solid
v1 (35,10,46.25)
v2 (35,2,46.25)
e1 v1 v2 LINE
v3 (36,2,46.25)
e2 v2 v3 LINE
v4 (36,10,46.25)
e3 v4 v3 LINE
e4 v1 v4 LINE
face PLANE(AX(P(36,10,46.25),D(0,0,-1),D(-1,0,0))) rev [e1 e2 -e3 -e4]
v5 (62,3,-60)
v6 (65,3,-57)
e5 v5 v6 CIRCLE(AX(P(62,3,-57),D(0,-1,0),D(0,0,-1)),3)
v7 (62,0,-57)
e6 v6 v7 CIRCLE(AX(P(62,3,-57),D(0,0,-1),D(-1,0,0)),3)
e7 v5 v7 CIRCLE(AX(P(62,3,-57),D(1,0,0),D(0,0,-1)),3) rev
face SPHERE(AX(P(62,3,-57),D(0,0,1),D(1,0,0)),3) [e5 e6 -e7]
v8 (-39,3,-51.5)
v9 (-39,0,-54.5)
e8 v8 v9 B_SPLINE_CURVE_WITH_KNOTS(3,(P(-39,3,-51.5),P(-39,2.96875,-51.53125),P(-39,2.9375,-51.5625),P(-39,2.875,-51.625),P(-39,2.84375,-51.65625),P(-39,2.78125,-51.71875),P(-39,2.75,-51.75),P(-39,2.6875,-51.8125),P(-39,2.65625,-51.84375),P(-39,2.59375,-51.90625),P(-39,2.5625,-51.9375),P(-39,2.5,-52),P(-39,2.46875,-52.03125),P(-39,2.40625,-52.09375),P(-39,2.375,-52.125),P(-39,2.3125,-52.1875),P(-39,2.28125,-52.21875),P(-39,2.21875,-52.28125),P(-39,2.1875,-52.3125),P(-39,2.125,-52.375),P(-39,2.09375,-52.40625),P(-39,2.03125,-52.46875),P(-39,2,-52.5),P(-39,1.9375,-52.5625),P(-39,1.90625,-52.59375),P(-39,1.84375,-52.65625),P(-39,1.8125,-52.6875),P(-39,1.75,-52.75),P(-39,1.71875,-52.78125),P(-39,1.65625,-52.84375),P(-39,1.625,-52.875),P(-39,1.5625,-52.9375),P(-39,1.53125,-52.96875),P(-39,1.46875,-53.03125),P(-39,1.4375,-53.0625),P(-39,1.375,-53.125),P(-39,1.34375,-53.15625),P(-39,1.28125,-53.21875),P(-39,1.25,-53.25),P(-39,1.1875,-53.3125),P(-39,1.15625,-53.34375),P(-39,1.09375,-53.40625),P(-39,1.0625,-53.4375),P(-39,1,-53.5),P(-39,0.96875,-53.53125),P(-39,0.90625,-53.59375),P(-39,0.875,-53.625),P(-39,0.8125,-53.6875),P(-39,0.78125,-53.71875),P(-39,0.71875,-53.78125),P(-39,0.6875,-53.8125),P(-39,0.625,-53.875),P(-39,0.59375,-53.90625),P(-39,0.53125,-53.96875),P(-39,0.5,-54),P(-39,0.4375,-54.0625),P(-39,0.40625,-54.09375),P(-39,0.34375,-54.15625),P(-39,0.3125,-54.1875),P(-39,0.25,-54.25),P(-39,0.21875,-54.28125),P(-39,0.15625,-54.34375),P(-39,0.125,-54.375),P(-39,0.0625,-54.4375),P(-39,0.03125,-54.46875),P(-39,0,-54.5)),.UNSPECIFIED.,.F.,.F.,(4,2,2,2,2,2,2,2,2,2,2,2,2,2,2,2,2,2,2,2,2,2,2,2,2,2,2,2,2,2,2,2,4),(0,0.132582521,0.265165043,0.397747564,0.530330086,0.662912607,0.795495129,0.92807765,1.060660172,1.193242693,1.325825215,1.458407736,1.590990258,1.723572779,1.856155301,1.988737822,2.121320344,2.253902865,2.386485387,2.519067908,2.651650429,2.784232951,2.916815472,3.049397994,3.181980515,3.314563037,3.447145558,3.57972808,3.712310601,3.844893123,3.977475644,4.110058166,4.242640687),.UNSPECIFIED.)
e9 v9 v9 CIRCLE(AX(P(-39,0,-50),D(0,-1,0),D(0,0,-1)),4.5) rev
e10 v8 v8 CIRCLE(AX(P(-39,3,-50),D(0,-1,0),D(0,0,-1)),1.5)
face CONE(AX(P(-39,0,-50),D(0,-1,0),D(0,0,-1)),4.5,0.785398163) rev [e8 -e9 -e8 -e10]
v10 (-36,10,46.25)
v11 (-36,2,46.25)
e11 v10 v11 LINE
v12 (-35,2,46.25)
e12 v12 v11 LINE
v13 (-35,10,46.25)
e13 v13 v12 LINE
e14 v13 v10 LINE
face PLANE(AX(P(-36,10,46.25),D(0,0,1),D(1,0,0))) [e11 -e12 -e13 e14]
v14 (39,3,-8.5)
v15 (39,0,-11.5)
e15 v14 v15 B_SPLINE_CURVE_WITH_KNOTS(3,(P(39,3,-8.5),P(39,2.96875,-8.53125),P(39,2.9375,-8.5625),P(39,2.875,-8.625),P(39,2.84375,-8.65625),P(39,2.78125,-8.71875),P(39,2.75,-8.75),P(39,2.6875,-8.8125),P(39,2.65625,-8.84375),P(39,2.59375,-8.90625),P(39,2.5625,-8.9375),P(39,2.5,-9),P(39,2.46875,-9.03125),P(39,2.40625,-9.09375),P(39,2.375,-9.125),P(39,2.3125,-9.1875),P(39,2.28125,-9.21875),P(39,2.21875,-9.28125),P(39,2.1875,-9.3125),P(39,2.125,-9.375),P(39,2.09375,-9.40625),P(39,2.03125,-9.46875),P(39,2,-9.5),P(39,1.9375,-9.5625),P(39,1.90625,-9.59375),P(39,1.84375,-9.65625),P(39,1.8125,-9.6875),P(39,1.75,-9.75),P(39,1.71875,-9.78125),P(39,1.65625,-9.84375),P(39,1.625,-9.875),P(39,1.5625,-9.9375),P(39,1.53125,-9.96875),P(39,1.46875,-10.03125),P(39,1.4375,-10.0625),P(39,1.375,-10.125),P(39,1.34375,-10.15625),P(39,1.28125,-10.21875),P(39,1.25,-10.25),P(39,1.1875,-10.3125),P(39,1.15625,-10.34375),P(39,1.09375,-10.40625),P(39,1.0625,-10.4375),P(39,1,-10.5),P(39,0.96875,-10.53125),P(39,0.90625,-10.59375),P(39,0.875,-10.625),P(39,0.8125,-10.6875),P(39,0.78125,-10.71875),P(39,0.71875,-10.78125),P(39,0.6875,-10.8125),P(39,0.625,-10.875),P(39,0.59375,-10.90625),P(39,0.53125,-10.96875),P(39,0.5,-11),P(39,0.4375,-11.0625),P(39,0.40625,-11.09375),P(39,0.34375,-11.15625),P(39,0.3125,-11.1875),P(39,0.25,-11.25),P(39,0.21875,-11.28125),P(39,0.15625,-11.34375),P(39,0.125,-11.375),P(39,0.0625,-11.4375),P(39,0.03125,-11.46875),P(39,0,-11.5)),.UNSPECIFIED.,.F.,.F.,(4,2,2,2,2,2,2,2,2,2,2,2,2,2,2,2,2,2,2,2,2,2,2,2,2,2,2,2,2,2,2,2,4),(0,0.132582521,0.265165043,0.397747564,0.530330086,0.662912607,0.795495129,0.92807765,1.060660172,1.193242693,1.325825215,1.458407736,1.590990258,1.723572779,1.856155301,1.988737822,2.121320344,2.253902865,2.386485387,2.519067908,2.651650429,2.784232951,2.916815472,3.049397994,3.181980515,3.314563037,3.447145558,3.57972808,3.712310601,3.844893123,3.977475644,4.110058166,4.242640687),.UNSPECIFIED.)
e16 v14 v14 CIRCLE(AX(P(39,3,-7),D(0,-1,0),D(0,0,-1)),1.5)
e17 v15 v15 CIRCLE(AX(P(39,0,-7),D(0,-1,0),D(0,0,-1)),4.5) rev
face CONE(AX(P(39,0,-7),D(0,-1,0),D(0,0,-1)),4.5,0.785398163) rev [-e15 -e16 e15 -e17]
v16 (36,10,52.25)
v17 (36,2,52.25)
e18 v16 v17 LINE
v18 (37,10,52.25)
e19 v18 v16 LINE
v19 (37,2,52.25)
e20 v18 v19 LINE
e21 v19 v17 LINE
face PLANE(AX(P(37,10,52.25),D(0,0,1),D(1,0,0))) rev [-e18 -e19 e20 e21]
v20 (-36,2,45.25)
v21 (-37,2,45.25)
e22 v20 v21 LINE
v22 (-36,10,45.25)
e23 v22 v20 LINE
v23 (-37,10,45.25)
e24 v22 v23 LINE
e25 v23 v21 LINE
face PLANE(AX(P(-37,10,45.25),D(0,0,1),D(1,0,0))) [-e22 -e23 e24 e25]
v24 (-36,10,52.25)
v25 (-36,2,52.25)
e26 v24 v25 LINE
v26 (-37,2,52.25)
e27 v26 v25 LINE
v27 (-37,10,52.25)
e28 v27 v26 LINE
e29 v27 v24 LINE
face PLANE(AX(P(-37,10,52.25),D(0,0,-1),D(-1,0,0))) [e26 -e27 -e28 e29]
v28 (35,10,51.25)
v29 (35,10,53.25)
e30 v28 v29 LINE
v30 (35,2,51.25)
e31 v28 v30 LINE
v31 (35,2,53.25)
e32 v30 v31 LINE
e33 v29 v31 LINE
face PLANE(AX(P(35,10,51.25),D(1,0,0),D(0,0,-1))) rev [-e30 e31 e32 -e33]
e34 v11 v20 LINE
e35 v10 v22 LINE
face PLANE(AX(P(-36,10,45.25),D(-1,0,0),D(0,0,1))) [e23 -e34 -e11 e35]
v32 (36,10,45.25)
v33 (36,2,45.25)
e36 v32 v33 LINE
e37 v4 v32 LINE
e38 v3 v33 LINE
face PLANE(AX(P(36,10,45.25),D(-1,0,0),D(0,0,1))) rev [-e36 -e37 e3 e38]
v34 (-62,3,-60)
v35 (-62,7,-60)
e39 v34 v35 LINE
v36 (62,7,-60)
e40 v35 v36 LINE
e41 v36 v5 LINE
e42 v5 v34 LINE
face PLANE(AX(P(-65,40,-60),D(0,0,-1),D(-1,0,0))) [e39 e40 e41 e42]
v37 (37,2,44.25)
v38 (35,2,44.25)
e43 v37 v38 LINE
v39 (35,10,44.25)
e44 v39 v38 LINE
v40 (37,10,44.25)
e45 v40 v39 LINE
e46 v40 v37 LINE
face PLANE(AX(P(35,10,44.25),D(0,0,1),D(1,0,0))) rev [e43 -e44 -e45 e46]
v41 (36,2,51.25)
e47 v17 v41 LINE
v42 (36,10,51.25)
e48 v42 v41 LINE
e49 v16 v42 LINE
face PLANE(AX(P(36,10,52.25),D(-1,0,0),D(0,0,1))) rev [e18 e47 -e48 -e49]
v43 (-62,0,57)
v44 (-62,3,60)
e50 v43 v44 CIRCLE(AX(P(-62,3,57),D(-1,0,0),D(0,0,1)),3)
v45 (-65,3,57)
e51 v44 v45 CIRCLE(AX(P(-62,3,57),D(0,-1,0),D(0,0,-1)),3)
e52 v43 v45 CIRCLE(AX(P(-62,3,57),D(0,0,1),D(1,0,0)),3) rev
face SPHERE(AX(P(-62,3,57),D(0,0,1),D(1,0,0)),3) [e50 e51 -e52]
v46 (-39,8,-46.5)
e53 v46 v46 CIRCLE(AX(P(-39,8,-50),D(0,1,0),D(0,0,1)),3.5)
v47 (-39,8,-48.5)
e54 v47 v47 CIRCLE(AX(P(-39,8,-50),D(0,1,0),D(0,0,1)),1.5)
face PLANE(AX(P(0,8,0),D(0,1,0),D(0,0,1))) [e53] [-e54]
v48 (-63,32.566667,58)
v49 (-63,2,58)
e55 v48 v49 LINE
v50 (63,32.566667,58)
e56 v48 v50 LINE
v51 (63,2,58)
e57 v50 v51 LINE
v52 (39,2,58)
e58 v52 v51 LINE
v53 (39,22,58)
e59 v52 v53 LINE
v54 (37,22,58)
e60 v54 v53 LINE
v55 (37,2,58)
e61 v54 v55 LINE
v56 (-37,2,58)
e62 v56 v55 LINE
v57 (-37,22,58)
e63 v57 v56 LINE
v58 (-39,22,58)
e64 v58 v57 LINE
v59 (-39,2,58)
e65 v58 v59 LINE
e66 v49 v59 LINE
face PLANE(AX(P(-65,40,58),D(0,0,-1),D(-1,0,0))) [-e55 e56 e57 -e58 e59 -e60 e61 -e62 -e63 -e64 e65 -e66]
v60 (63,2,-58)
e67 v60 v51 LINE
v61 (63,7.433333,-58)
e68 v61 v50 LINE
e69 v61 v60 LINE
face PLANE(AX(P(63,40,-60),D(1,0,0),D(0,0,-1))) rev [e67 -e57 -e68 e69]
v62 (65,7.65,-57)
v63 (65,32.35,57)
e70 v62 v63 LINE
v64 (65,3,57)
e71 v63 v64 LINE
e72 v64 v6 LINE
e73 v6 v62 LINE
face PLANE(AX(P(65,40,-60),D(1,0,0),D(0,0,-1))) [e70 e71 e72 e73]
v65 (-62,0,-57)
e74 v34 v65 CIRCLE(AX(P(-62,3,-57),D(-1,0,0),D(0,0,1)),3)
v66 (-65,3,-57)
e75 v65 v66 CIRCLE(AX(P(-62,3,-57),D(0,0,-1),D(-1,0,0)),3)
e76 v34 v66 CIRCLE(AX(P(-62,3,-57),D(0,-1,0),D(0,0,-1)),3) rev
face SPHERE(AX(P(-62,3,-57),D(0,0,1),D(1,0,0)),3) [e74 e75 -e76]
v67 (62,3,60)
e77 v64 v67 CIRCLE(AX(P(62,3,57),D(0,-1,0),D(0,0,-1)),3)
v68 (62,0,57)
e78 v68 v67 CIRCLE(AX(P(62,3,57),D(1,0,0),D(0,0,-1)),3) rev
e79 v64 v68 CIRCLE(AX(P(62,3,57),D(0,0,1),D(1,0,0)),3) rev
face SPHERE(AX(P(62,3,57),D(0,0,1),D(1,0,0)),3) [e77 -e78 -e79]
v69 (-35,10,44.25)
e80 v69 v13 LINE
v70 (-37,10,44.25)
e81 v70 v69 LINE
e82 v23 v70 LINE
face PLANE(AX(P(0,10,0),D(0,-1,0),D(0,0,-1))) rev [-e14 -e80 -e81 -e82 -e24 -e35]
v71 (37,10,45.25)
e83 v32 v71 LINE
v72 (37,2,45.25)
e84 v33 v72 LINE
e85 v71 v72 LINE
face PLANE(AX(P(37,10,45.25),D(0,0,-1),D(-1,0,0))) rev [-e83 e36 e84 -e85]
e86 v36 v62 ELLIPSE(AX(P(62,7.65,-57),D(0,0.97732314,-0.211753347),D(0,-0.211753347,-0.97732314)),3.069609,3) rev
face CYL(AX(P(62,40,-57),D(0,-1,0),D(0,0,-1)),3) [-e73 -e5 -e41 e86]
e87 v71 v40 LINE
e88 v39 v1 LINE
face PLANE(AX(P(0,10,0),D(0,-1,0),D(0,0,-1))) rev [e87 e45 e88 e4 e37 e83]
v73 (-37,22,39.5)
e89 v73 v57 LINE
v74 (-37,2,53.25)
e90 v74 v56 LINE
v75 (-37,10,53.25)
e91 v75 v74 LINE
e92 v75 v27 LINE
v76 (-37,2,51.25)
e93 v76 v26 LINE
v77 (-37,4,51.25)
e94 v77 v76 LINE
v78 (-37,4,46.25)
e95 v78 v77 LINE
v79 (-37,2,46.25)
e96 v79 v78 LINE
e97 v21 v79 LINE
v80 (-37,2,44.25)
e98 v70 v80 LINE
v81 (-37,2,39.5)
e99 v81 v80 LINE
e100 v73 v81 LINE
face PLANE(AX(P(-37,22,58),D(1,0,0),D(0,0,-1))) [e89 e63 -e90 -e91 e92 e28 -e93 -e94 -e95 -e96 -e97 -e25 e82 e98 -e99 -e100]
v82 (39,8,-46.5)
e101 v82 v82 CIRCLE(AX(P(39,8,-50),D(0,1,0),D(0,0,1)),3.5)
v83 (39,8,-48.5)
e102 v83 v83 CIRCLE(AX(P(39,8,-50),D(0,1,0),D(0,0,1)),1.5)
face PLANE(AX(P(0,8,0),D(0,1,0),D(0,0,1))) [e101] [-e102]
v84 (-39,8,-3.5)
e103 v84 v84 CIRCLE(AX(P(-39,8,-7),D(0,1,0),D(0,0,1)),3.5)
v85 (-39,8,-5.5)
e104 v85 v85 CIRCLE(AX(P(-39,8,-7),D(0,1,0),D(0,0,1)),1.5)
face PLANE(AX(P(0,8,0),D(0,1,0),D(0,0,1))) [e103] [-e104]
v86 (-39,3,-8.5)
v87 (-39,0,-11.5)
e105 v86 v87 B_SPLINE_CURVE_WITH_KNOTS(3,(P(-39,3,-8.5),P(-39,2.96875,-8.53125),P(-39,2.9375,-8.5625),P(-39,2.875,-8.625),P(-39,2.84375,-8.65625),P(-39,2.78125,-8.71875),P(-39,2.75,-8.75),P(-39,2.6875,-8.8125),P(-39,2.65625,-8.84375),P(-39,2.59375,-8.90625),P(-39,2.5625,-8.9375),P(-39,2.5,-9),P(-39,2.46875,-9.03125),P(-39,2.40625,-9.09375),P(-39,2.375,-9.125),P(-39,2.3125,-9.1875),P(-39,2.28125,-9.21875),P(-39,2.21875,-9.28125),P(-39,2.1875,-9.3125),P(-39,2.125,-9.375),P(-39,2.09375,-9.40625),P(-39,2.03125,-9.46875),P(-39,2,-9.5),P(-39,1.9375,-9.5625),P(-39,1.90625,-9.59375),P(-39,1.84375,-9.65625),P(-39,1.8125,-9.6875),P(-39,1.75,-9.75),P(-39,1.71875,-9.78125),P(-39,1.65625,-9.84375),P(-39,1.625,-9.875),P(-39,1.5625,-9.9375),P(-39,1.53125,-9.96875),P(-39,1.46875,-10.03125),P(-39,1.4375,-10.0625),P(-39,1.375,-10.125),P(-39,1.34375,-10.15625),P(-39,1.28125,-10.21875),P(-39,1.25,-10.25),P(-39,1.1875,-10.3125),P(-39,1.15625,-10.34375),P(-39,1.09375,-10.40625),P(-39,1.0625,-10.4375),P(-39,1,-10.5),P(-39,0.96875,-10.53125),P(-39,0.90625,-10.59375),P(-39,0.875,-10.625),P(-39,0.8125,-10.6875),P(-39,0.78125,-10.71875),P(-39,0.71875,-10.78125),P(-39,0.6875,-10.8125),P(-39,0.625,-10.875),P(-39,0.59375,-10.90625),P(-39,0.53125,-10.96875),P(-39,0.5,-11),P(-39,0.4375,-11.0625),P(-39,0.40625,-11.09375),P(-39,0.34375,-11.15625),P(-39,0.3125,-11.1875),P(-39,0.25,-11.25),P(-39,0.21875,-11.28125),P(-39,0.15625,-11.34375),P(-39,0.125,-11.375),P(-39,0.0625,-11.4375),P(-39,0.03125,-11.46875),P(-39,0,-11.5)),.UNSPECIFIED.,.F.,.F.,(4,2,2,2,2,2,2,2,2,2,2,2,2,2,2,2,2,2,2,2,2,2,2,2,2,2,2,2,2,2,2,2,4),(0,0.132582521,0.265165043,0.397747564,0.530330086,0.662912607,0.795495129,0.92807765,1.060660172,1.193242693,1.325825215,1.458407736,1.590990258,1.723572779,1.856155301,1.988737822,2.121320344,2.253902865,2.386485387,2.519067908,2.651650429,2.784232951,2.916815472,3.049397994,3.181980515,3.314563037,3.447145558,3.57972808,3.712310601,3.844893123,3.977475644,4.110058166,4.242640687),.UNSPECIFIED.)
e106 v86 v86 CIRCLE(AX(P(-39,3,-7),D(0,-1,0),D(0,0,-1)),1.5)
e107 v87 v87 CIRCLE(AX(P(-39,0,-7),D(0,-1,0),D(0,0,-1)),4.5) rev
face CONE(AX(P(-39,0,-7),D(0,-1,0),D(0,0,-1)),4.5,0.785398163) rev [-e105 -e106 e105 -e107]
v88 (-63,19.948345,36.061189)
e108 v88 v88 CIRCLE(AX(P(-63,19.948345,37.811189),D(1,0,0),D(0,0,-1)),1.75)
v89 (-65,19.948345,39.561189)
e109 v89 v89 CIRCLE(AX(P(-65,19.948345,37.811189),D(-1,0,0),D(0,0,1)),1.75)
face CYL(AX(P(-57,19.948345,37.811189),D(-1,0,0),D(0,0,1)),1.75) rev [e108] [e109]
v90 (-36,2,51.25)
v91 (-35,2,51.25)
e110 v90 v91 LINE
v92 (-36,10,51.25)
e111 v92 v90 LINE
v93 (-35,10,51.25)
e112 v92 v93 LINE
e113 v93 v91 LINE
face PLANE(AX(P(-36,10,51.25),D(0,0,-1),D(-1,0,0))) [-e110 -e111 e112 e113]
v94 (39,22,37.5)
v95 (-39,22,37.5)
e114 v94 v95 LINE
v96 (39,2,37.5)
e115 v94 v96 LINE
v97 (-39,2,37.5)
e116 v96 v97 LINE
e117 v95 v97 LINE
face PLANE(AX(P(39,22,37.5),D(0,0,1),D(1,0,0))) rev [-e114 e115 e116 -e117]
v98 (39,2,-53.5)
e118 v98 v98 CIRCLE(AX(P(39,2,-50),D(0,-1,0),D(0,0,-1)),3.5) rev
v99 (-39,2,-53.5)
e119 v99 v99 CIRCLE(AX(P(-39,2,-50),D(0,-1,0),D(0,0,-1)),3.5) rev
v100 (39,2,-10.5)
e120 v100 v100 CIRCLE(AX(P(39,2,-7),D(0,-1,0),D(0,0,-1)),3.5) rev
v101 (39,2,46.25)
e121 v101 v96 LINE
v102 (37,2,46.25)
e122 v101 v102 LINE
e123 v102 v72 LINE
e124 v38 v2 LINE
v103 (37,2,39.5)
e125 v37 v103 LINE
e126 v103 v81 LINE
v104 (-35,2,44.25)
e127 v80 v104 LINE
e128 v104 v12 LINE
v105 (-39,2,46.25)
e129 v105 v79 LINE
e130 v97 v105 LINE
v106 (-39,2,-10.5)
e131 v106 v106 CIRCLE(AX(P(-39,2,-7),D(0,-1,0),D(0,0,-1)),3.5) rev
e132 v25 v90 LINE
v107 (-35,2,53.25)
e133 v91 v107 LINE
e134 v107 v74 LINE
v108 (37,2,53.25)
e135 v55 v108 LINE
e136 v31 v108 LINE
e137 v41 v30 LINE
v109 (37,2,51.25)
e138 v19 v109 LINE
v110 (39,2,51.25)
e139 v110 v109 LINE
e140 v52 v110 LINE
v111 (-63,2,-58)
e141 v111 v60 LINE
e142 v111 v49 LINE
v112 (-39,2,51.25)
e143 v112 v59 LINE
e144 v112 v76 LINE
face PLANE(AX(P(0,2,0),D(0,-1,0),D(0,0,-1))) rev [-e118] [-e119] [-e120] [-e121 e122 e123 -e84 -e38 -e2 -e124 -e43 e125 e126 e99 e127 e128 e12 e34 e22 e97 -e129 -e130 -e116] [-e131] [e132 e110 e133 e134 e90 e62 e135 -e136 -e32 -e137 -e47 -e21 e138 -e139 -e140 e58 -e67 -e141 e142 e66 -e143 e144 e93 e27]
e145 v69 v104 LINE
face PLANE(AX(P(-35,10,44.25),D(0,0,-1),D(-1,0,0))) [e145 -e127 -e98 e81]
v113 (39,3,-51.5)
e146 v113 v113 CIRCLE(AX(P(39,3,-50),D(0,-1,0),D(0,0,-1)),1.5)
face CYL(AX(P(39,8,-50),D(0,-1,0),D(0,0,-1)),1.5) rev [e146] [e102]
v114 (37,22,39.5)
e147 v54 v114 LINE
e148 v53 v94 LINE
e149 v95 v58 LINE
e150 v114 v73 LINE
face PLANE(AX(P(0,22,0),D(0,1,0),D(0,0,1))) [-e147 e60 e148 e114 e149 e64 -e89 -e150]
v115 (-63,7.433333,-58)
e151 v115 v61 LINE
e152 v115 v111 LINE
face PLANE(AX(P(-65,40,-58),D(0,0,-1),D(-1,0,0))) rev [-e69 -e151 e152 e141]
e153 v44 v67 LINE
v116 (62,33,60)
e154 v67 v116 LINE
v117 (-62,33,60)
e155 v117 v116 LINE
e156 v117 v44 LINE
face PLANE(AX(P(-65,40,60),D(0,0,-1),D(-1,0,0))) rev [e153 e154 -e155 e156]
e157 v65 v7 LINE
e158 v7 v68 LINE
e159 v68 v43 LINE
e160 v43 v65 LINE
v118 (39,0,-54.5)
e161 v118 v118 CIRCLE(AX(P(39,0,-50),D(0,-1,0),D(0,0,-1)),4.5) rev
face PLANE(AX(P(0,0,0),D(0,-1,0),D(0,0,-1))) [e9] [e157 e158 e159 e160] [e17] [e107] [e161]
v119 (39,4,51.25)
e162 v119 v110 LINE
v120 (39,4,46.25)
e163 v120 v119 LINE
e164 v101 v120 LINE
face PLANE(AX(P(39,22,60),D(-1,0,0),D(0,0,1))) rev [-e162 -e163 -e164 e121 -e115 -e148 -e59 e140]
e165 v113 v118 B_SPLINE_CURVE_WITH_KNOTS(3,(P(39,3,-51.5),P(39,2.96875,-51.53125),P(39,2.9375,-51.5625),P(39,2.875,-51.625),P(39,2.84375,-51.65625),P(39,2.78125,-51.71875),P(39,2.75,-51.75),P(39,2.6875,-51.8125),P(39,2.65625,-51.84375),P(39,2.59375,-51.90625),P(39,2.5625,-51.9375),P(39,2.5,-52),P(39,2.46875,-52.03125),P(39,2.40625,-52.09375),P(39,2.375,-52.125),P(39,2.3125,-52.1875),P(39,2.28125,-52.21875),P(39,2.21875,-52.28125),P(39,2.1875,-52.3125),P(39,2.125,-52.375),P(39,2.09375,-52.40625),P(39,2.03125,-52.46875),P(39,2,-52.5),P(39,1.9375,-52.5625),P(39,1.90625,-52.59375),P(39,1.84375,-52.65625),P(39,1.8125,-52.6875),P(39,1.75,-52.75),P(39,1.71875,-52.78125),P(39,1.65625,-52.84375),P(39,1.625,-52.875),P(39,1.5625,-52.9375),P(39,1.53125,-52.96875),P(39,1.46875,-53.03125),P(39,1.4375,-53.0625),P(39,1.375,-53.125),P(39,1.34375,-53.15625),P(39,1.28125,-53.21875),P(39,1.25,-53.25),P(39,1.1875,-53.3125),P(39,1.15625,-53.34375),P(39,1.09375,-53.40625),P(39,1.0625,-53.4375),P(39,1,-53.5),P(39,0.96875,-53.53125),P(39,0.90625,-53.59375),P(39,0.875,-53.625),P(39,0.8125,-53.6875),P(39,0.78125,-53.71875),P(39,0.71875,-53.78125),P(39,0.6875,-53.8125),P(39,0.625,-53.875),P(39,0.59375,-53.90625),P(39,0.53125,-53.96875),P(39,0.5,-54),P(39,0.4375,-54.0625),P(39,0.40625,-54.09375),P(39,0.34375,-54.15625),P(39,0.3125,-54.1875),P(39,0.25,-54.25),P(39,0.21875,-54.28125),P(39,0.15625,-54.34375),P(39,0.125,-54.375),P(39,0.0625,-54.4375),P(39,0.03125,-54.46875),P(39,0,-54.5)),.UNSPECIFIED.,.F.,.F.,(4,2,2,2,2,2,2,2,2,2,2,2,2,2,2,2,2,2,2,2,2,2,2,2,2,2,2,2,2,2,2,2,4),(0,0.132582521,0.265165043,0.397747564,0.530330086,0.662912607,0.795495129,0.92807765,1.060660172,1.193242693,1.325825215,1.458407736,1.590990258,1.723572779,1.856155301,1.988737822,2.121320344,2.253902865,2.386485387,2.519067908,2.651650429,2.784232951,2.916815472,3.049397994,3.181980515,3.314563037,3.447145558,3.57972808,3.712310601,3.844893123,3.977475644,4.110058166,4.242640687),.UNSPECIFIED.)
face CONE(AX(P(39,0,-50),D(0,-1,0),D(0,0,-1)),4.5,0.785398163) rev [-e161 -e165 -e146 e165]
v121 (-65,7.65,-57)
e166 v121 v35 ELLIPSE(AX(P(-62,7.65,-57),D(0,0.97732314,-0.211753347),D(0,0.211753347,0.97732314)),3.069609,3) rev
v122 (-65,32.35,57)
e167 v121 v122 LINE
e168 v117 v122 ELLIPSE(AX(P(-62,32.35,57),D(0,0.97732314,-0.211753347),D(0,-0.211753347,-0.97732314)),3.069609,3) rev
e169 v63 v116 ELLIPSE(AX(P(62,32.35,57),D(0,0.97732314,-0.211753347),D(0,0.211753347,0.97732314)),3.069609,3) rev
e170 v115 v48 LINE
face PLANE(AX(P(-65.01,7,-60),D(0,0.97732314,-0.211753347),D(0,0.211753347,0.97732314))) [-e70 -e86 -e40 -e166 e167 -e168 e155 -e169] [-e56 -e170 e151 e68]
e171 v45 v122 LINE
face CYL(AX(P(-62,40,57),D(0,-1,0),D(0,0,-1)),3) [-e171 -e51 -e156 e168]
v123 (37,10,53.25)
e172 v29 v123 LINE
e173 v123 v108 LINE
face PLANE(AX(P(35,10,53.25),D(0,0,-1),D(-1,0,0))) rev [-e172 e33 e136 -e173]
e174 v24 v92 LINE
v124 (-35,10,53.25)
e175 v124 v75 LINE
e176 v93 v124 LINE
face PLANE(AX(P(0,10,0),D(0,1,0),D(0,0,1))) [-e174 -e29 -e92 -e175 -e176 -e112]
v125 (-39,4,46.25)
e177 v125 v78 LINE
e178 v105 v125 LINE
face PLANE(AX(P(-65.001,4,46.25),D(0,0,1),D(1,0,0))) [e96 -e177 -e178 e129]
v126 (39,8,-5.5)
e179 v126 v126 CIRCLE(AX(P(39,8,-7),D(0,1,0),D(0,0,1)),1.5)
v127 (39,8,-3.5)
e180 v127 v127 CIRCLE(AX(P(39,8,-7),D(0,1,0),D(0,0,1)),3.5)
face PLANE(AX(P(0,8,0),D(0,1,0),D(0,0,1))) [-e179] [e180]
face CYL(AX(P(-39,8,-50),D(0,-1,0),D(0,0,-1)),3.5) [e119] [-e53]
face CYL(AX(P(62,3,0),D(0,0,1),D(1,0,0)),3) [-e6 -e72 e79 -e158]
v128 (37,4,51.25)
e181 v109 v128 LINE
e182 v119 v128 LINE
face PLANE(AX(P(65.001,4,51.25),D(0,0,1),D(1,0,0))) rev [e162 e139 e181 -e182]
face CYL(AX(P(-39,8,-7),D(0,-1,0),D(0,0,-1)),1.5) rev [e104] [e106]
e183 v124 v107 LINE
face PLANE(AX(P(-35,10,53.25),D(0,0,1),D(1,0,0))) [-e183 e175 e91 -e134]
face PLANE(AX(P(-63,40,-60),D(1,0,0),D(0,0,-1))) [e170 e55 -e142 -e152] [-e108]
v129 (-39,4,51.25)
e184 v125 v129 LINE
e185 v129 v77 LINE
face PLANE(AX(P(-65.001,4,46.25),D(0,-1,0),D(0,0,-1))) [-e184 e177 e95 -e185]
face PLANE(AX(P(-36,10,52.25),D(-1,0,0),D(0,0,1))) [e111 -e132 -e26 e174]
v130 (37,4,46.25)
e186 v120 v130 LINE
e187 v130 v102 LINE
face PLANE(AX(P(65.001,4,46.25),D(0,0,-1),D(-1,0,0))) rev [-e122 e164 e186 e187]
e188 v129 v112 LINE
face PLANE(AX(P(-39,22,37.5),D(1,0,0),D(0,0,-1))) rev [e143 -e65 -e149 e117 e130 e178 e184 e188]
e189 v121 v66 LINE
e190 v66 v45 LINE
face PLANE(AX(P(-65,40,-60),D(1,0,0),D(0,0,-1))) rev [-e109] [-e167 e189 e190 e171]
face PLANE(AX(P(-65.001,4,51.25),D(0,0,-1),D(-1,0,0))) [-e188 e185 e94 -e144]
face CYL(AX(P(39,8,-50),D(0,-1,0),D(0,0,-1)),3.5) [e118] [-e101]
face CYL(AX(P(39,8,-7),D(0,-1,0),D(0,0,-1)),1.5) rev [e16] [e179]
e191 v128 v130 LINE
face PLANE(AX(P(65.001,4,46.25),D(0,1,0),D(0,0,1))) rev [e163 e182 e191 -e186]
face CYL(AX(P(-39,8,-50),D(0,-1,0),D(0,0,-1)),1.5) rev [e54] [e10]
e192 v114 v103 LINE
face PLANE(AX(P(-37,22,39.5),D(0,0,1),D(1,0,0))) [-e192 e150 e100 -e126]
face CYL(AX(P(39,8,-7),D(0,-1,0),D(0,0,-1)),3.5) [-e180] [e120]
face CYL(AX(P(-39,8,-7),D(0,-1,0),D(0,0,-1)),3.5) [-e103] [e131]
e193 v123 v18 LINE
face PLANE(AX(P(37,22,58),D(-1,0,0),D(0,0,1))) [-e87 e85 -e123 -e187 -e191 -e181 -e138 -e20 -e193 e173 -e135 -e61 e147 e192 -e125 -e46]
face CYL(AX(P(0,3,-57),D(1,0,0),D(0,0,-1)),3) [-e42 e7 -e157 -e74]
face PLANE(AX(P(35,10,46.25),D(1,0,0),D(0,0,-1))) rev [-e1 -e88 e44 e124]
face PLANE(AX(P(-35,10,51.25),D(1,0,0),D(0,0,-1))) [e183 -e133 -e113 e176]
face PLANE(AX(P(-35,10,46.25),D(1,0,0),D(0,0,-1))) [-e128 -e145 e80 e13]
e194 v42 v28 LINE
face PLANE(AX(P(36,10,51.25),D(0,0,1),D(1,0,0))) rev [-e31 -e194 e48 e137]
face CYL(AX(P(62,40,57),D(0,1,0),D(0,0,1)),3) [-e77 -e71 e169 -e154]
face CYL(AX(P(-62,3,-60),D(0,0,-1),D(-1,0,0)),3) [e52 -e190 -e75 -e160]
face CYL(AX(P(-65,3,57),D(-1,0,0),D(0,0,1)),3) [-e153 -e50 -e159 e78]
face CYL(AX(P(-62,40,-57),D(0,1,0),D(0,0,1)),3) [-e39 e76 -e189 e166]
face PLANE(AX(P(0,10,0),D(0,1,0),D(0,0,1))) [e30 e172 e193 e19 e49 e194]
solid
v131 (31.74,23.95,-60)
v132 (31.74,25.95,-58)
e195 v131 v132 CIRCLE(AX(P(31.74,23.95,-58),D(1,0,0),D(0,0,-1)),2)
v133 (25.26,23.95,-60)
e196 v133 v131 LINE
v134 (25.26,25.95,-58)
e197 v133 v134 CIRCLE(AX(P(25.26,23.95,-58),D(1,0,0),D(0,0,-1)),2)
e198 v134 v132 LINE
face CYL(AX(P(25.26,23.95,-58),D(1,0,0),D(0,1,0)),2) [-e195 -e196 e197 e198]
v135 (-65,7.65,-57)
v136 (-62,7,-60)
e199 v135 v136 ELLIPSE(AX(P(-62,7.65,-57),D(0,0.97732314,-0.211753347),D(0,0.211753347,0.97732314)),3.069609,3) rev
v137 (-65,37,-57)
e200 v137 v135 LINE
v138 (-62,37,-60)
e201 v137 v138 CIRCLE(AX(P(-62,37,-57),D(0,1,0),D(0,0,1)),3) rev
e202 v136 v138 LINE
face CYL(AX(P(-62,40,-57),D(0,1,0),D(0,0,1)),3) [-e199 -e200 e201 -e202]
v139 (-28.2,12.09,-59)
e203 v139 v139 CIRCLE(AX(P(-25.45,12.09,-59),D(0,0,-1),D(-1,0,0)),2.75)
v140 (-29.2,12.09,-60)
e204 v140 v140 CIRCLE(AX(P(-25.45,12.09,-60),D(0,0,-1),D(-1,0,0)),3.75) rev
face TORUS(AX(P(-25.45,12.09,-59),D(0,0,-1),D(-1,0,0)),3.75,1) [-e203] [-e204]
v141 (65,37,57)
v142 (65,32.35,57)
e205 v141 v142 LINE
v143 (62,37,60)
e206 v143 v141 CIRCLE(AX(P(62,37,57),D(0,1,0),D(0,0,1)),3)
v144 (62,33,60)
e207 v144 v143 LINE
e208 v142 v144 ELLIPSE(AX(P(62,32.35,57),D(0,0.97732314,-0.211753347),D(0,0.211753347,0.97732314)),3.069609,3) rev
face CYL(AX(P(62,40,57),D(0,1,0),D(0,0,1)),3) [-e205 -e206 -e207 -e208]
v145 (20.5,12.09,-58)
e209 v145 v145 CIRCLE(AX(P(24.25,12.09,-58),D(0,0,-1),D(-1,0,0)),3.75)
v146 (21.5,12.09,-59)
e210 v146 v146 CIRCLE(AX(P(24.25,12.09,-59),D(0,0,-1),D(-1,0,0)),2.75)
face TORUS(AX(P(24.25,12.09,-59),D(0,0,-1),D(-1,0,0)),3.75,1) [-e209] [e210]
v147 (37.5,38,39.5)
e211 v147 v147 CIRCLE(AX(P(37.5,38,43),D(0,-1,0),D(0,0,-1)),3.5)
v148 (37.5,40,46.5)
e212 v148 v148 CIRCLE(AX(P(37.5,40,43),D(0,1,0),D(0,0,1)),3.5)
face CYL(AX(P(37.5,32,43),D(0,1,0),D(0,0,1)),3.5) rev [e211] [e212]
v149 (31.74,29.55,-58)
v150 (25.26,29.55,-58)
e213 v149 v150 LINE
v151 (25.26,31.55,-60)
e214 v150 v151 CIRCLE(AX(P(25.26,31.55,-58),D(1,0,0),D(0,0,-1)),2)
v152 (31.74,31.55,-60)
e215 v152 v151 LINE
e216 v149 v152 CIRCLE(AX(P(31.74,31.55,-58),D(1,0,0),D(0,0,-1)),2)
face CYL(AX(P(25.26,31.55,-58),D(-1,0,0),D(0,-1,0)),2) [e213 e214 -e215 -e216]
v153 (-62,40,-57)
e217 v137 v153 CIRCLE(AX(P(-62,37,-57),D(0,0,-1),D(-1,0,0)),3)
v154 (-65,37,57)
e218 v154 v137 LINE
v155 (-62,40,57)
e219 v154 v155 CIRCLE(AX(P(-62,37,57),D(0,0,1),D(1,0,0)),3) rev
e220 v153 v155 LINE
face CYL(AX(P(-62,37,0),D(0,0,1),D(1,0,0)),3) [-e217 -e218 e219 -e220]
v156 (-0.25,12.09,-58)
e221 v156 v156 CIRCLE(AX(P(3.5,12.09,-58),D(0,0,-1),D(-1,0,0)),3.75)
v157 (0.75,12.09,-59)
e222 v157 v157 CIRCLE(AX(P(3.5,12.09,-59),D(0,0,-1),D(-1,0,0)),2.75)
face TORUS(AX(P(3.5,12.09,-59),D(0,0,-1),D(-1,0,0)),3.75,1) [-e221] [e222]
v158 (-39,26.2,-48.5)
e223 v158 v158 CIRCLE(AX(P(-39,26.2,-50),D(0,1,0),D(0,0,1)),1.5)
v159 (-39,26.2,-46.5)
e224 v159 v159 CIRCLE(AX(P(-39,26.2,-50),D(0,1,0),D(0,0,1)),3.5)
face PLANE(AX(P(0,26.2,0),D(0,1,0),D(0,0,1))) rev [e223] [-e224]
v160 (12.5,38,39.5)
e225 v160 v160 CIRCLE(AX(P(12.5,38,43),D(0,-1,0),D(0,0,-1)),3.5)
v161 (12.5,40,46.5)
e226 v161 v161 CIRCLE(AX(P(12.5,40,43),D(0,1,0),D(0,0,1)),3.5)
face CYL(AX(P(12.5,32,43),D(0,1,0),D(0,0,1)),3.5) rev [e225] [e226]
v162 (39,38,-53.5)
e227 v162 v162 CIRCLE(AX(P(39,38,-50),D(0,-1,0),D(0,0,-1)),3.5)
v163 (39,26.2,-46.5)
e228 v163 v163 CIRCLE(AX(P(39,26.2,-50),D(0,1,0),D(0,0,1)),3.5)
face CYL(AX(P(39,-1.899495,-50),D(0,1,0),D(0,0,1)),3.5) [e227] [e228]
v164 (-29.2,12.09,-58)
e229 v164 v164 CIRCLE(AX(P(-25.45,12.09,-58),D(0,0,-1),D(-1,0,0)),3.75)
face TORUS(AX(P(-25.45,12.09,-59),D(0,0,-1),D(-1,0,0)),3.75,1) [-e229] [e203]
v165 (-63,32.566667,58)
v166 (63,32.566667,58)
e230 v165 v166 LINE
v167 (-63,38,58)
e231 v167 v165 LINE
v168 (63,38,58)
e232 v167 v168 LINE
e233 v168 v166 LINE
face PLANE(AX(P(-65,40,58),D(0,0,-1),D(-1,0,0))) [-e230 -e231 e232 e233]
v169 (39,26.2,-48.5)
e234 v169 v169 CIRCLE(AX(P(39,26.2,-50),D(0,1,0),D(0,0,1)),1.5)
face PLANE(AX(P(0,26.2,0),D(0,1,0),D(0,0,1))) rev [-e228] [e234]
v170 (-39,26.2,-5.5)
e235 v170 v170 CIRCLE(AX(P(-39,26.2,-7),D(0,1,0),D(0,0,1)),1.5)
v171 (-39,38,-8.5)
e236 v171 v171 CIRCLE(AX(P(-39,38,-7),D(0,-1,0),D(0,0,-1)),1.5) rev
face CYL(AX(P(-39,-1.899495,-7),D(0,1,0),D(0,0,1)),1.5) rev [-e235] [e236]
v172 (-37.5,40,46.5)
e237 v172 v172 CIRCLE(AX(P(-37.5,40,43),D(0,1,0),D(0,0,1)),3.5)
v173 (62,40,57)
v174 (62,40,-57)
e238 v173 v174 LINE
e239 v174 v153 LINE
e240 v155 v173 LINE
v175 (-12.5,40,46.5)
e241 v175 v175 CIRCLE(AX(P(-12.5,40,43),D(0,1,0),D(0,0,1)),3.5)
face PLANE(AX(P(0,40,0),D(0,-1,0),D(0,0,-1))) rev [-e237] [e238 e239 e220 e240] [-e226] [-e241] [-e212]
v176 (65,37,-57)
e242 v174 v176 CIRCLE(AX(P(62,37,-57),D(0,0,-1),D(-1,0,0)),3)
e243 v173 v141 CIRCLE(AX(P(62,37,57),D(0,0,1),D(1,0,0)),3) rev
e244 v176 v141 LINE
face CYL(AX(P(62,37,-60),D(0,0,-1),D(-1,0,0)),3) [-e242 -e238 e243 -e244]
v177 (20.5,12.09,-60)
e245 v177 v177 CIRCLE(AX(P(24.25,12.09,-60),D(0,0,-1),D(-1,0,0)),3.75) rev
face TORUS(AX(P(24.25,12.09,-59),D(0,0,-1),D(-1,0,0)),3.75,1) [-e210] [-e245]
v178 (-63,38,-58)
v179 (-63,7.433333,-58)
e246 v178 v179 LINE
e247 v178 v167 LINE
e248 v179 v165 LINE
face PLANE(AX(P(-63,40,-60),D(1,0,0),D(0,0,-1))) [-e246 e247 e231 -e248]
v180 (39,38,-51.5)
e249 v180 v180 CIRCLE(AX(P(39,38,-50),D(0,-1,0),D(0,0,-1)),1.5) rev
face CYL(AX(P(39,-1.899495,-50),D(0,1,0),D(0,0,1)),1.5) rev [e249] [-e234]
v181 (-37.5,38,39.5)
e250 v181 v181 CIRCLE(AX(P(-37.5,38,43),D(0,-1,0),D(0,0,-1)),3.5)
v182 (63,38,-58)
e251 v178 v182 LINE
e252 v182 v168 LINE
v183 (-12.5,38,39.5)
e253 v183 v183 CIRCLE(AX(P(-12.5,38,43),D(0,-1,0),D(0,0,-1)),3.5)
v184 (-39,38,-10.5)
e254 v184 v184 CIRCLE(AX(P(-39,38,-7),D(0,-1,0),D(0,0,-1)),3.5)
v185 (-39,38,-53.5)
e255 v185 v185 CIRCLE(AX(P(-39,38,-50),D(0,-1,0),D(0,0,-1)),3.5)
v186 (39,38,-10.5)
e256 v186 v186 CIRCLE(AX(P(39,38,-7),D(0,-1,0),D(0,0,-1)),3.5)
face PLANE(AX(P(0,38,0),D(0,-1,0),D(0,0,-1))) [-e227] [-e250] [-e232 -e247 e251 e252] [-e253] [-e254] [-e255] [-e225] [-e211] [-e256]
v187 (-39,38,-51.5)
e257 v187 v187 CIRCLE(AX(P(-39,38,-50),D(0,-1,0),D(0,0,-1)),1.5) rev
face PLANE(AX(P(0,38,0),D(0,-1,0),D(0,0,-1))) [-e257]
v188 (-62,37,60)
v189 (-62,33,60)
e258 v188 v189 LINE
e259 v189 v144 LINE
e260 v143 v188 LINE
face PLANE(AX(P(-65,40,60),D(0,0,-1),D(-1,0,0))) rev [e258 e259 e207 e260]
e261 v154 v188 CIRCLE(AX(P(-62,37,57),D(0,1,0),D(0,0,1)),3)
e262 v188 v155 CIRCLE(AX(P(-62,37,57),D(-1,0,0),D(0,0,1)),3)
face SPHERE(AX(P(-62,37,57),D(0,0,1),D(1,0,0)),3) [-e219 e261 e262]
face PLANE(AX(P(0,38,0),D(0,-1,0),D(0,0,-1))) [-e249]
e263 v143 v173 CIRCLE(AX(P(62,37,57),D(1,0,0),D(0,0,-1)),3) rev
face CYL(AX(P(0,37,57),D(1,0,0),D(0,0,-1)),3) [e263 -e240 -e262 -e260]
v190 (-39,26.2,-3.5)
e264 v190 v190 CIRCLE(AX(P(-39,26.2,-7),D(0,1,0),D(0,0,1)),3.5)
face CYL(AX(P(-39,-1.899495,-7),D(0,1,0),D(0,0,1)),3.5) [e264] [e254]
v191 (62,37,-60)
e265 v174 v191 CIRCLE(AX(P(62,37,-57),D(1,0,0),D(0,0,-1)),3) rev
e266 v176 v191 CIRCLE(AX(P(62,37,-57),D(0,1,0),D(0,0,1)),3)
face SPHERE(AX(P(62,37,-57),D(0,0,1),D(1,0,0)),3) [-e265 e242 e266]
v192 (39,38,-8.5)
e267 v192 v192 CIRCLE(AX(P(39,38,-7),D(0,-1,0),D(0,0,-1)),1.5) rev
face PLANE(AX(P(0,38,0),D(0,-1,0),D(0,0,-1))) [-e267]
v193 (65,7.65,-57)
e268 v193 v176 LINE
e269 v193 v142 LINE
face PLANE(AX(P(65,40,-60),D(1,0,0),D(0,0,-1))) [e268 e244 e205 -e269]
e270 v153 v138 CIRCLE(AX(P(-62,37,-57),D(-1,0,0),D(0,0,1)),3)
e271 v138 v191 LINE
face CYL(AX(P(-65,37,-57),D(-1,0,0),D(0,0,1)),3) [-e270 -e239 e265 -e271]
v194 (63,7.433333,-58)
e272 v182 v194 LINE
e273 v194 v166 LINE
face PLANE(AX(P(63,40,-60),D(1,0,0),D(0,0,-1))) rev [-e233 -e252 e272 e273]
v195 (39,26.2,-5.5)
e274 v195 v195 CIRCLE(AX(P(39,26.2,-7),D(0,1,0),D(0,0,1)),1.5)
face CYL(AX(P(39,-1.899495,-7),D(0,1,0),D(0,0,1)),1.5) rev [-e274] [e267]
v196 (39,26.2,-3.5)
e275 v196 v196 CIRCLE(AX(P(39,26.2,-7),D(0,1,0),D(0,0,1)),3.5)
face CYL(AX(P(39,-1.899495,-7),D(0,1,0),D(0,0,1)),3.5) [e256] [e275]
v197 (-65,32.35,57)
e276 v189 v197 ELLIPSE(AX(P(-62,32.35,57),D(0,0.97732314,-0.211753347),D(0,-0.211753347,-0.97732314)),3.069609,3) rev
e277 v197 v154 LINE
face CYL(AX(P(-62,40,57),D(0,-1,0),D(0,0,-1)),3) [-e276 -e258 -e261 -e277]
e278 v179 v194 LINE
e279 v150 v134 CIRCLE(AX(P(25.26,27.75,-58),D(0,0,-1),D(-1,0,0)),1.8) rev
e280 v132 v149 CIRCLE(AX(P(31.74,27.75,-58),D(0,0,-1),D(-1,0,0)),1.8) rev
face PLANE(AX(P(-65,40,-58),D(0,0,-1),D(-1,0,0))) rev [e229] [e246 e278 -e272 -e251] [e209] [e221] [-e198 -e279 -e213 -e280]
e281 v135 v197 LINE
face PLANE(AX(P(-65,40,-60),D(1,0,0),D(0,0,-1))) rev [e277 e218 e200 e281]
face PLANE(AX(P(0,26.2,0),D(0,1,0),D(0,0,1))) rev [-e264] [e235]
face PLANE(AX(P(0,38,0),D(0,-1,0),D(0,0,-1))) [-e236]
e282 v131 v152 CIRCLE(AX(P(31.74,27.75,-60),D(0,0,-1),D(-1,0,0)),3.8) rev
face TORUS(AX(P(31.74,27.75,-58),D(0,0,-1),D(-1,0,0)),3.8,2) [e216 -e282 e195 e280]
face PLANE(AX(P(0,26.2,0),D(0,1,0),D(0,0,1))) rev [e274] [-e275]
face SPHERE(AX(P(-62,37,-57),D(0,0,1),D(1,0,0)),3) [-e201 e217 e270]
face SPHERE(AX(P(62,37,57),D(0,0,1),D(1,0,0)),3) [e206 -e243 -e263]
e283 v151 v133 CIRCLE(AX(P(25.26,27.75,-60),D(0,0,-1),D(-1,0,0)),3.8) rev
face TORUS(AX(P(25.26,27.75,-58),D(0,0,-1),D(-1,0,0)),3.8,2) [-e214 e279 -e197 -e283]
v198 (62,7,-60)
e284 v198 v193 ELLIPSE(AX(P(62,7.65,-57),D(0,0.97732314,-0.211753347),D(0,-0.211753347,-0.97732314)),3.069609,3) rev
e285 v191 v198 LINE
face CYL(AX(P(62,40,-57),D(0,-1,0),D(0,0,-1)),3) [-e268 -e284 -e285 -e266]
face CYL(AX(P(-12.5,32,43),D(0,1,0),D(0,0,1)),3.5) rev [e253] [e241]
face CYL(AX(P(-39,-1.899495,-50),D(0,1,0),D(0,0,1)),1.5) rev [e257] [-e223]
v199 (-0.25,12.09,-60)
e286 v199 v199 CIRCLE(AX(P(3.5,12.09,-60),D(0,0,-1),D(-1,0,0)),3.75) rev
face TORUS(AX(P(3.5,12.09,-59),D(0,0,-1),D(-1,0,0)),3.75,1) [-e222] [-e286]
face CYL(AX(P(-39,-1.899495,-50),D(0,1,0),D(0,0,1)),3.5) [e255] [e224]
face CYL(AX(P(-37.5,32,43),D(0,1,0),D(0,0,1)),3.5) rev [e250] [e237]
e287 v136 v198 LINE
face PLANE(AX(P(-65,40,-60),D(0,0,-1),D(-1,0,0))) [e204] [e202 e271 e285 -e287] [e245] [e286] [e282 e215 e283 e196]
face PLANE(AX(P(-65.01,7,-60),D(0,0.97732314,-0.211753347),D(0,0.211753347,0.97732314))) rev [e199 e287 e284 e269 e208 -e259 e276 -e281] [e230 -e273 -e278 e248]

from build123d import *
from OCP.BRepFilletAPI import BRepFilletAPI_MakeFillet

# Parameters (mm, degrees)
SKETCH1_W                      = 130
SKETCH1_H                      = 120
BOSS_EXTRUDE1_DEPTH            = 40
SHELL1_T                       = 2
SKETCH1_7_R                    = 3.5
SKETCH1_7_R_2                  = 1.5
BOSS_EXTRUDE2_DEPTH            = 8
SKETCH2_W                      = 78
SKETCH2_H                      = 22.5
SKETCH2_W_2                    = 74
SKETCH2_H_2                    = 18.5
BOSS_EXTRUDE3_DEPTH            = 20
BOSS_EXTRUDE4_DEPTH            = 8
FILLET1_R                      = 3
CUT_EXTRUDE1_REACH             = 126.916
SKETCH3_W                      = 5
SKETCH3_H                      = 2
CUT_EXTRUDE1_DIRECTION_2_REACH = 126.916
BOSS_EXTRUDE5_START            = 26.2
SKETCH1_9_R                    = 3.5
SKETCH1_9_R_2                  = 1.5
BOSS_EXTRUDE5_DEPTH            = 11.8
SKETCH1_11_R                   = 1.5
CUT_EXTRUDE3_DEPTH             = 8
CHAMFER1_SIZE                  = 3
SKETCH6_R                      = 3.5
CUT_EXTRUDE4_DEPTH             = 8
SKETCH7_R                      = 1.75
CUT_EXTRUDE5_DEPTH             = 8
SPLIT1_SURFACE_1_BACK          = 182.384
SPLIT1_SURFACE_1_DEPTH         = 364.768
SPLIT1_SURFACE_2_BACK          = 182.384
SPLIT1_SURFACE_2_DEPTH         = 364.768
SKETCH9_R                      = 2.75
CUT_EXTRUDE6_DEPTH             = 2
FILLET2_R                      = 2
FILLET2_R_2                    = 1


with BuildPart() as part:
    # Sketch1 → Boss-Extrude1 (new body)
    with BuildSketch(Plane(origin=(0, 0, 0), x_dir=(1, 0, 0), z_dir=(0, 1, 0))):
        Rectangle(SKETCH1_W, SKETCH1_H)
    extrude(amount=BOSS_EXTRUDE1_DEPTH)

    # Shell1 (no face opened: a closed hollow body)
    add(offset(amount=-SHELL1_T, mode=Mode.PRIVATE), mode=Mode.SUBTRACT)

    # Sketch1<7> → Boss-Extrude2 (add)
    # profile 1 of 4: a face of its own
    with BuildSketch(Plane(origin=(0, 0, 0), x_dir=(1, 0, 0), z_dir=(0, 1, 0))):
        with Locations(Location((-39, 7, 0), (0, 0, 90))):
            Circle(SKETCH1_7_R)
        with Locations(Location((-39, 7, 0), (0, 0, 90))):
            Circle(SKETCH1_7_R_2, mode=Mode.SUBTRACT)
    # profile 2 of 4: a face of its own
    with BuildSketch(Plane(origin=(0, 0, 0), x_dir=(1, 0, 0), z_dir=(0, 1, 0))):
        with Locations(Location((-39, 50, 0), (0, 0, 90))):
            Circle(SKETCH1_7_R)
        with Locations(Location((-39, 50, 0), (0, 0, 90))):
            Circle(SKETCH1_7_R_2, mode=Mode.SUBTRACT)
    # profile 3 of 4: a face of its own
    with BuildSketch(Plane(origin=(0, 0, 0), x_dir=(1, 0, 0), z_dir=(0, 1, 0))):
        with Locations(Location((39, 50, 0), (0, 0, 90))):
            Circle(SKETCH1_7_R)
        with Locations(Location((39, 50, 0), (0, 0, 90))):
            Circle(SKETCH1_7_R_2, mode=Mode.SUBTRACT)
    # profile 4 of 4: a face of its own
    with BuildSketch(Plane(origin=(0, 0, 0), x_dir=(1, 0, 0), z_dir=(0, 1, 0))):
        with Locations(Location((39, 7, 0), (0, 0, 90))):
            Circle(SKETCH1_7_R)
        with Locations(Location((39, 7, 0), (0, 0, 90))):
            Circle(SKETCH1_7_R_2, mode=Mode.SUBTRACT)
    extrude(amount=BOSS_EXTRUDE2_DEPTH)

    # Sketch2 → Boss-Extrude3 (add)
    with BuildSketch(Plane(origin=(0, 2, 0), x_dir=(1, 0, 0), z_dir=(0, 1, 0))):
        with Locations((0, -48.75)):
            Rectangle(SKETCH2_W, SKETCH2_H)
        with Locations((0, -48.75)):
            Rectangle(SKETCH2_W_2, SKETCH2_H_2, mode=Mode.SUBTRACT)
    extrude(amount=BOSS_EXTRUDE3_DEPTH)

    # Sketch4 → Boss-Extrude4 (add)
    with BuildSketch(Plane(origin=(0, 2, 0), x_dir=(1, 0, 0), z_dir=(0, 1, 0))):
        Polygon((37, -45.25), (36, -45.25), (36, -46.25), (35, -46.25), (35, -44.25), (37, -44.25), align=None)
        Polygon((37, -52.25), (36, -52.25), (36, -51.25), (35, -51.25), (35, -53.25), (37, -53.25), align=None)
    boss_extrude4 = extrude(amount=BOSS_EXTRUDE4_DEPTH)

    # Fillet1
    fillet1_edges = [part.edges().sort_by_distance(p)[0] for p in [
        (0, 40, 60),
        (-65, 40, 0),
        (0, 40, -60),
        (-65, 0, 0),
        (0, 0, 60),
        (65, 0, 0),
        (0, 0, -60),
        (65, 40, 0),
        (-65, 20, -60),
        (-65, 20, 60),
        (65, 20, 60),
        (65, 20, -60),
    ]]
    fillet(fillet1_edges, radius=FILLET1_R)

    # Sketch3 → Cut-Extrude1 (cut, up to next)
    with BuildSketch(Plane.ZY.offset(-37), mode=Mode.PRIVATE) as cut_extrude1_sk1:
        with Locations((48.75, 3)):
            Rectangle(SKETCH3_W, SKETCH3_H)
    cut_extrude1_tool1 = extrude(cut_extrude1_sk1.sketch, amount=-CUT_EXTRUDE1_REACH, mode=Mode.PRIVATE) & part.part
    add(cut_extrude1_tool1.solids().sort_by_distance((37, 3, 48.75))[0], mode=Mode.SUBTRACT)

    # Sketch3 → Cut-Extrude1 direction 2 (cut, up to next)
    with BuildSketch(Plane.ZY.offset(-37), mode=Mode.PRIVATE) as cut_extrude1_direction_2_sk1:
        with Locations((48.75, 3)):
            Rectangle(SKETCH3_W, SKETCH3_H)
    cut_extrude1_direction_2_tool1 = extrude(cut_extrude1_direction_2_sk1.sketch, amount=CUT_EXTRUDE1_DIRECTION_2_REACH, mode=Mode.PRIVATE) & part.part
    add(cut_extrude1_direction_2_tool1.solids().sort_by_distance((37, 3, 48.75))[0], mode=Mode.SUBTRACT)

    # Mirror1: Boss-Extrude4 across plane
    add(boss_extrude4.mirror(Plane(origin=(0, 0, 0), x_dir=(0, 0, 1), z_dir=(1, 0, 0))))

    # Sketch1<9> → Boss-Extrude5 (add)
    # profile 1 of 4: a face of its own
    with BuildSketch(Plane(origin=(0, 0, 0), x_dir=(1, 0, 0), z_dir=(0, 1, 0)).offset(BOSS_EXTRUDE5_START)):
        with Locations(Location((-39, 50, 0), (0, 0, 90))):
            Circle(SKETCH1_9_R)
        with Locations(Location((-39, 50, 0), (0, 0, 90))):
            Circle(SKETCH1_9_R_2, mode=Mode.SUBTRACT)
    # profile 2 of 4: a face of its own
    with BuildSketch(Plane(origin=(0, 0, 0), x_dir=(1, 0, 0), z_dir=(0, 1, 0)).offset(BOSS_EXTRUDE5_START)):
        with Locations(Location((-39, 7, 0), (0, 0, 90))):
            Circle(SKETCH1_9_R)
        with Locations(Location((-39, 7, 0), (0, 0, 90))):
            Circle(SKETCH1_9_R_2, mode=Mode.SUBTRACT)
    # profile 3 of 4: a face of its own
    with BuildSketch(Plane(origin=(0, 0, 0), x_dir=(1, 0, 0), z_dir=(0, 1, 0)).offset(BOSS_EXTRUDE5_START)):
        with Locations(Location((39, 50, 0), (0, 0, 90))):
            Circle(SKETCH1_9_R)
        with Locations(Location((39, 50, 0), (0, 0, 90))):
            Circle(SKETCH1_9_R_2, mode=Mode.SUBTRACT)
    # profile 4 of 4: a face of its own
    with BuildSketch(Plane(origin=(0, 0, 0), x_dir=(1, 0, 0), z_dir=(0, 1, 0)).offset(BOSS_EXTRUDE5_START)):
        with Locations(Location((39, 7, 0), (0, 0, 90))):
            Circle(SKETCH1_9_R)
        with Locations(Location((39, 7, 0), (0, 0, 90))):
            Circle(SKETCH1_9_R_2, mode=Mode.SUBTRACT)
    extrude(amount=BOSS_EXTRUDE5_DEPTH)

    # Sketch1<11> → Cut-Extrude3 (cut)
    with BuildSketch(Plane(origin=(0, 0, 0), x_dir=(1, 0, 0), z_dir=(0, 1, 0))):
        with Locations(Location((39, 50, 0), (0, 0, 270))):
            Circle(SKETCH1_11_R)
        with Locations(Location((-39, 7, 0), (0, 0, 270))):
            Circle(SKETCH1_11_R)
        with Locations(Location((-39, 50, 0), (0, 0, 270))):
            Circle(SKETCH1_11_R)
        with Locations(Location((39, 7, 0), (0, 0, 270))):
            Circle(SKETCH1_11_R)
    extrude(amount=CUT_EXTRUDE3_DEPTH, mode=Mode.SUBTRACT)

    # Chamfer1
    chamfer1_edges = [part.edges().sort_by_distance(p)[0] for p in [
        (39, 0, -8.5),
        (-39, 0, -51.5),
        (-39, 0, -8.5),
        (39, 0, -51.5),
    ]]
    chamfer(chamfer1_edges, length=CHAMFER1_SIZE)

    # Sketch6 → Cut-Extrude4 (cut)
    with BuildSketch(Plane(origin=(0, 40, 0), x_dir=(1, 0, 0), z_dir=(0, 1, 0))):
        with Locations(Location((-37.5, -43, 0), (0, 0, 270))):
            Circle(SKETCH6_R)
        with Locations(Location((-12.5, -43, 0), (0, 0, 270))):
            Circle(SKETCH6_R)
        with Locations(Location((12.5, -43, 0), (0, 0, 270))):
            Circle(SKETCH6_R)
        with Locations(Location((37.5, -43, 0), (0, 0, 270))):
            Circle(SKETCH6_R)
    extrude(amount=-CUT_EXTRUDE4_DEPTH, mode=Mode.SUBTRACT)

    # Sketch7 → Cut-Extrude5 (cut)
    with BuildSketch(Plane.ZY.offset(65)):
        with Locations((37.811189131, 19.94834537)):
            Circle(SKETCH7_R)
    extrude(amount=-CUT_EXTRUDE5_DEPTH, mode=Mode.SUBTRACT)


with BuildPart() as body_2:
    # Split1: the piece behind the surface
    add(part.part)
    # Split1 surface: a surface, the sketch's curves swept straight by 364.768 mm
    with BuildLine(Plane(origin=(0, 0, 0), x_dir=(0, 0, -1), z_dir=(1, 0, 0)).offset(-SPLIT1_SURFACE_1_BACK), mode=Mode.PRIVATE) as split1_surface_1_path:
        Line((60, 7), (-60, 33))
    split1_surface_1 = Shell.extrude(split1_surface_1_path.wire(), (1 * SPLIT1_SURFACE_1_DEPTH, 0 * SPLIT1_SURFACE_1_DEPTH, 0 * SPLIT1_SURFACE_1_DEPTH))
    split(bisect_by=split1_surface_1, keep=Keep.BOTTOM)

    # Sketch9 → Cut-Extrude6 (cut)
    with BuildSketch(Plane(origin=(0, 0, -60), x_dir=(-1, 0, 0), z_dir=(0, 0, -1))):
        with Locations((-24.25, 12.09)):
            Circle(SKETCH9_R)
        with Locations((-3.5, 12.09)):
            Circle(SKETCH9_R)
        with Locations((25.45, 12.09)):
            Circle(SKETCH9_R)
        with BuildLine():
            Line((-25.260000016, 25.949999999), (-31.739999982, 25.949999999))
            ThreePointArc((-31.739999982, 25.949999999), (-33.539999982, 27.749999999), (-31.739999982, 29.549999999))
            Line((-31.739999982, 29.549999999), (-25.260000016, 29.549999999))
            ThreePointArc((-25.260000016, 29.549999999), (-23.460000016, 27.749999999), (-25.260000016, 25.949999999))
        make_face()
    extrude(amount=-CUT_EXTRUDE6_DEPTH, mode=Mode.SUBTRACT)

    # Fillet2
    fillet2_edges_1 = [body_2.edges().sort_by_distance(p)[0] for p in [
        (28.499999999, 25.949999999, -60),
    ]]
    fillet2_edges_2 = [body_2.edges().sort_by_distance(p)[0] for p in [
        (27, 12.09, -60),
        (6.25, 12.09, -60),
        (-22.7, 12.09, -60),
        (6.25, 12.09, -58),
        (27, 12.09, -58),
        (-22.7, 12.09, -58),
    ]]
    fillet2 = BRepFilletAPI_MakeFillet(body_2.part.solid().wrapped)
    for e in fillet2_edges_1:
        fillet2.Add(FILLET2_R - 0.0001, e.wrapped)
    for e in fillet2_edges_2:
        fillet2.Add(FILLET2_R_2 - 0.0001, e.wrapped)
    add(Compound.cast(fillet2.Shape()), mode=Mode.REPLACE)  # a hair under: the kernel refuses the full size


with BuildPart() as part_1:
    add(part.part)

    # Split1: split by a surface, the side it looks to stays
    # Split1 surface: a surface, the sketch's curves swept straight by 364.768 mm
    with BuildLine(Plane(origin=(0, 0, 0), x_dir=(0, 0, -1), z_dir=(1, 0, 0)).offset(-SPLIT1_SURFACE_2_BACK), mode=Mode.PRIVATE) as split1_surface_2_path:
        Line((60, 7), (-60, 33))
    split1_surface_2 = Shell.extrude(split1_surface_2_path.wire(), (1 * SPLIT1_SURFACE_2_DEPTH, 0 * SPLIT1_SURFACE_2_DEPTH, 0 * SPLIT1_SURFACE_2_DEPTH))
    split(bisect_by=split1_surface_2, keep=Keep.TOP)


solid = Compound([body_2.part, part_1.part])
